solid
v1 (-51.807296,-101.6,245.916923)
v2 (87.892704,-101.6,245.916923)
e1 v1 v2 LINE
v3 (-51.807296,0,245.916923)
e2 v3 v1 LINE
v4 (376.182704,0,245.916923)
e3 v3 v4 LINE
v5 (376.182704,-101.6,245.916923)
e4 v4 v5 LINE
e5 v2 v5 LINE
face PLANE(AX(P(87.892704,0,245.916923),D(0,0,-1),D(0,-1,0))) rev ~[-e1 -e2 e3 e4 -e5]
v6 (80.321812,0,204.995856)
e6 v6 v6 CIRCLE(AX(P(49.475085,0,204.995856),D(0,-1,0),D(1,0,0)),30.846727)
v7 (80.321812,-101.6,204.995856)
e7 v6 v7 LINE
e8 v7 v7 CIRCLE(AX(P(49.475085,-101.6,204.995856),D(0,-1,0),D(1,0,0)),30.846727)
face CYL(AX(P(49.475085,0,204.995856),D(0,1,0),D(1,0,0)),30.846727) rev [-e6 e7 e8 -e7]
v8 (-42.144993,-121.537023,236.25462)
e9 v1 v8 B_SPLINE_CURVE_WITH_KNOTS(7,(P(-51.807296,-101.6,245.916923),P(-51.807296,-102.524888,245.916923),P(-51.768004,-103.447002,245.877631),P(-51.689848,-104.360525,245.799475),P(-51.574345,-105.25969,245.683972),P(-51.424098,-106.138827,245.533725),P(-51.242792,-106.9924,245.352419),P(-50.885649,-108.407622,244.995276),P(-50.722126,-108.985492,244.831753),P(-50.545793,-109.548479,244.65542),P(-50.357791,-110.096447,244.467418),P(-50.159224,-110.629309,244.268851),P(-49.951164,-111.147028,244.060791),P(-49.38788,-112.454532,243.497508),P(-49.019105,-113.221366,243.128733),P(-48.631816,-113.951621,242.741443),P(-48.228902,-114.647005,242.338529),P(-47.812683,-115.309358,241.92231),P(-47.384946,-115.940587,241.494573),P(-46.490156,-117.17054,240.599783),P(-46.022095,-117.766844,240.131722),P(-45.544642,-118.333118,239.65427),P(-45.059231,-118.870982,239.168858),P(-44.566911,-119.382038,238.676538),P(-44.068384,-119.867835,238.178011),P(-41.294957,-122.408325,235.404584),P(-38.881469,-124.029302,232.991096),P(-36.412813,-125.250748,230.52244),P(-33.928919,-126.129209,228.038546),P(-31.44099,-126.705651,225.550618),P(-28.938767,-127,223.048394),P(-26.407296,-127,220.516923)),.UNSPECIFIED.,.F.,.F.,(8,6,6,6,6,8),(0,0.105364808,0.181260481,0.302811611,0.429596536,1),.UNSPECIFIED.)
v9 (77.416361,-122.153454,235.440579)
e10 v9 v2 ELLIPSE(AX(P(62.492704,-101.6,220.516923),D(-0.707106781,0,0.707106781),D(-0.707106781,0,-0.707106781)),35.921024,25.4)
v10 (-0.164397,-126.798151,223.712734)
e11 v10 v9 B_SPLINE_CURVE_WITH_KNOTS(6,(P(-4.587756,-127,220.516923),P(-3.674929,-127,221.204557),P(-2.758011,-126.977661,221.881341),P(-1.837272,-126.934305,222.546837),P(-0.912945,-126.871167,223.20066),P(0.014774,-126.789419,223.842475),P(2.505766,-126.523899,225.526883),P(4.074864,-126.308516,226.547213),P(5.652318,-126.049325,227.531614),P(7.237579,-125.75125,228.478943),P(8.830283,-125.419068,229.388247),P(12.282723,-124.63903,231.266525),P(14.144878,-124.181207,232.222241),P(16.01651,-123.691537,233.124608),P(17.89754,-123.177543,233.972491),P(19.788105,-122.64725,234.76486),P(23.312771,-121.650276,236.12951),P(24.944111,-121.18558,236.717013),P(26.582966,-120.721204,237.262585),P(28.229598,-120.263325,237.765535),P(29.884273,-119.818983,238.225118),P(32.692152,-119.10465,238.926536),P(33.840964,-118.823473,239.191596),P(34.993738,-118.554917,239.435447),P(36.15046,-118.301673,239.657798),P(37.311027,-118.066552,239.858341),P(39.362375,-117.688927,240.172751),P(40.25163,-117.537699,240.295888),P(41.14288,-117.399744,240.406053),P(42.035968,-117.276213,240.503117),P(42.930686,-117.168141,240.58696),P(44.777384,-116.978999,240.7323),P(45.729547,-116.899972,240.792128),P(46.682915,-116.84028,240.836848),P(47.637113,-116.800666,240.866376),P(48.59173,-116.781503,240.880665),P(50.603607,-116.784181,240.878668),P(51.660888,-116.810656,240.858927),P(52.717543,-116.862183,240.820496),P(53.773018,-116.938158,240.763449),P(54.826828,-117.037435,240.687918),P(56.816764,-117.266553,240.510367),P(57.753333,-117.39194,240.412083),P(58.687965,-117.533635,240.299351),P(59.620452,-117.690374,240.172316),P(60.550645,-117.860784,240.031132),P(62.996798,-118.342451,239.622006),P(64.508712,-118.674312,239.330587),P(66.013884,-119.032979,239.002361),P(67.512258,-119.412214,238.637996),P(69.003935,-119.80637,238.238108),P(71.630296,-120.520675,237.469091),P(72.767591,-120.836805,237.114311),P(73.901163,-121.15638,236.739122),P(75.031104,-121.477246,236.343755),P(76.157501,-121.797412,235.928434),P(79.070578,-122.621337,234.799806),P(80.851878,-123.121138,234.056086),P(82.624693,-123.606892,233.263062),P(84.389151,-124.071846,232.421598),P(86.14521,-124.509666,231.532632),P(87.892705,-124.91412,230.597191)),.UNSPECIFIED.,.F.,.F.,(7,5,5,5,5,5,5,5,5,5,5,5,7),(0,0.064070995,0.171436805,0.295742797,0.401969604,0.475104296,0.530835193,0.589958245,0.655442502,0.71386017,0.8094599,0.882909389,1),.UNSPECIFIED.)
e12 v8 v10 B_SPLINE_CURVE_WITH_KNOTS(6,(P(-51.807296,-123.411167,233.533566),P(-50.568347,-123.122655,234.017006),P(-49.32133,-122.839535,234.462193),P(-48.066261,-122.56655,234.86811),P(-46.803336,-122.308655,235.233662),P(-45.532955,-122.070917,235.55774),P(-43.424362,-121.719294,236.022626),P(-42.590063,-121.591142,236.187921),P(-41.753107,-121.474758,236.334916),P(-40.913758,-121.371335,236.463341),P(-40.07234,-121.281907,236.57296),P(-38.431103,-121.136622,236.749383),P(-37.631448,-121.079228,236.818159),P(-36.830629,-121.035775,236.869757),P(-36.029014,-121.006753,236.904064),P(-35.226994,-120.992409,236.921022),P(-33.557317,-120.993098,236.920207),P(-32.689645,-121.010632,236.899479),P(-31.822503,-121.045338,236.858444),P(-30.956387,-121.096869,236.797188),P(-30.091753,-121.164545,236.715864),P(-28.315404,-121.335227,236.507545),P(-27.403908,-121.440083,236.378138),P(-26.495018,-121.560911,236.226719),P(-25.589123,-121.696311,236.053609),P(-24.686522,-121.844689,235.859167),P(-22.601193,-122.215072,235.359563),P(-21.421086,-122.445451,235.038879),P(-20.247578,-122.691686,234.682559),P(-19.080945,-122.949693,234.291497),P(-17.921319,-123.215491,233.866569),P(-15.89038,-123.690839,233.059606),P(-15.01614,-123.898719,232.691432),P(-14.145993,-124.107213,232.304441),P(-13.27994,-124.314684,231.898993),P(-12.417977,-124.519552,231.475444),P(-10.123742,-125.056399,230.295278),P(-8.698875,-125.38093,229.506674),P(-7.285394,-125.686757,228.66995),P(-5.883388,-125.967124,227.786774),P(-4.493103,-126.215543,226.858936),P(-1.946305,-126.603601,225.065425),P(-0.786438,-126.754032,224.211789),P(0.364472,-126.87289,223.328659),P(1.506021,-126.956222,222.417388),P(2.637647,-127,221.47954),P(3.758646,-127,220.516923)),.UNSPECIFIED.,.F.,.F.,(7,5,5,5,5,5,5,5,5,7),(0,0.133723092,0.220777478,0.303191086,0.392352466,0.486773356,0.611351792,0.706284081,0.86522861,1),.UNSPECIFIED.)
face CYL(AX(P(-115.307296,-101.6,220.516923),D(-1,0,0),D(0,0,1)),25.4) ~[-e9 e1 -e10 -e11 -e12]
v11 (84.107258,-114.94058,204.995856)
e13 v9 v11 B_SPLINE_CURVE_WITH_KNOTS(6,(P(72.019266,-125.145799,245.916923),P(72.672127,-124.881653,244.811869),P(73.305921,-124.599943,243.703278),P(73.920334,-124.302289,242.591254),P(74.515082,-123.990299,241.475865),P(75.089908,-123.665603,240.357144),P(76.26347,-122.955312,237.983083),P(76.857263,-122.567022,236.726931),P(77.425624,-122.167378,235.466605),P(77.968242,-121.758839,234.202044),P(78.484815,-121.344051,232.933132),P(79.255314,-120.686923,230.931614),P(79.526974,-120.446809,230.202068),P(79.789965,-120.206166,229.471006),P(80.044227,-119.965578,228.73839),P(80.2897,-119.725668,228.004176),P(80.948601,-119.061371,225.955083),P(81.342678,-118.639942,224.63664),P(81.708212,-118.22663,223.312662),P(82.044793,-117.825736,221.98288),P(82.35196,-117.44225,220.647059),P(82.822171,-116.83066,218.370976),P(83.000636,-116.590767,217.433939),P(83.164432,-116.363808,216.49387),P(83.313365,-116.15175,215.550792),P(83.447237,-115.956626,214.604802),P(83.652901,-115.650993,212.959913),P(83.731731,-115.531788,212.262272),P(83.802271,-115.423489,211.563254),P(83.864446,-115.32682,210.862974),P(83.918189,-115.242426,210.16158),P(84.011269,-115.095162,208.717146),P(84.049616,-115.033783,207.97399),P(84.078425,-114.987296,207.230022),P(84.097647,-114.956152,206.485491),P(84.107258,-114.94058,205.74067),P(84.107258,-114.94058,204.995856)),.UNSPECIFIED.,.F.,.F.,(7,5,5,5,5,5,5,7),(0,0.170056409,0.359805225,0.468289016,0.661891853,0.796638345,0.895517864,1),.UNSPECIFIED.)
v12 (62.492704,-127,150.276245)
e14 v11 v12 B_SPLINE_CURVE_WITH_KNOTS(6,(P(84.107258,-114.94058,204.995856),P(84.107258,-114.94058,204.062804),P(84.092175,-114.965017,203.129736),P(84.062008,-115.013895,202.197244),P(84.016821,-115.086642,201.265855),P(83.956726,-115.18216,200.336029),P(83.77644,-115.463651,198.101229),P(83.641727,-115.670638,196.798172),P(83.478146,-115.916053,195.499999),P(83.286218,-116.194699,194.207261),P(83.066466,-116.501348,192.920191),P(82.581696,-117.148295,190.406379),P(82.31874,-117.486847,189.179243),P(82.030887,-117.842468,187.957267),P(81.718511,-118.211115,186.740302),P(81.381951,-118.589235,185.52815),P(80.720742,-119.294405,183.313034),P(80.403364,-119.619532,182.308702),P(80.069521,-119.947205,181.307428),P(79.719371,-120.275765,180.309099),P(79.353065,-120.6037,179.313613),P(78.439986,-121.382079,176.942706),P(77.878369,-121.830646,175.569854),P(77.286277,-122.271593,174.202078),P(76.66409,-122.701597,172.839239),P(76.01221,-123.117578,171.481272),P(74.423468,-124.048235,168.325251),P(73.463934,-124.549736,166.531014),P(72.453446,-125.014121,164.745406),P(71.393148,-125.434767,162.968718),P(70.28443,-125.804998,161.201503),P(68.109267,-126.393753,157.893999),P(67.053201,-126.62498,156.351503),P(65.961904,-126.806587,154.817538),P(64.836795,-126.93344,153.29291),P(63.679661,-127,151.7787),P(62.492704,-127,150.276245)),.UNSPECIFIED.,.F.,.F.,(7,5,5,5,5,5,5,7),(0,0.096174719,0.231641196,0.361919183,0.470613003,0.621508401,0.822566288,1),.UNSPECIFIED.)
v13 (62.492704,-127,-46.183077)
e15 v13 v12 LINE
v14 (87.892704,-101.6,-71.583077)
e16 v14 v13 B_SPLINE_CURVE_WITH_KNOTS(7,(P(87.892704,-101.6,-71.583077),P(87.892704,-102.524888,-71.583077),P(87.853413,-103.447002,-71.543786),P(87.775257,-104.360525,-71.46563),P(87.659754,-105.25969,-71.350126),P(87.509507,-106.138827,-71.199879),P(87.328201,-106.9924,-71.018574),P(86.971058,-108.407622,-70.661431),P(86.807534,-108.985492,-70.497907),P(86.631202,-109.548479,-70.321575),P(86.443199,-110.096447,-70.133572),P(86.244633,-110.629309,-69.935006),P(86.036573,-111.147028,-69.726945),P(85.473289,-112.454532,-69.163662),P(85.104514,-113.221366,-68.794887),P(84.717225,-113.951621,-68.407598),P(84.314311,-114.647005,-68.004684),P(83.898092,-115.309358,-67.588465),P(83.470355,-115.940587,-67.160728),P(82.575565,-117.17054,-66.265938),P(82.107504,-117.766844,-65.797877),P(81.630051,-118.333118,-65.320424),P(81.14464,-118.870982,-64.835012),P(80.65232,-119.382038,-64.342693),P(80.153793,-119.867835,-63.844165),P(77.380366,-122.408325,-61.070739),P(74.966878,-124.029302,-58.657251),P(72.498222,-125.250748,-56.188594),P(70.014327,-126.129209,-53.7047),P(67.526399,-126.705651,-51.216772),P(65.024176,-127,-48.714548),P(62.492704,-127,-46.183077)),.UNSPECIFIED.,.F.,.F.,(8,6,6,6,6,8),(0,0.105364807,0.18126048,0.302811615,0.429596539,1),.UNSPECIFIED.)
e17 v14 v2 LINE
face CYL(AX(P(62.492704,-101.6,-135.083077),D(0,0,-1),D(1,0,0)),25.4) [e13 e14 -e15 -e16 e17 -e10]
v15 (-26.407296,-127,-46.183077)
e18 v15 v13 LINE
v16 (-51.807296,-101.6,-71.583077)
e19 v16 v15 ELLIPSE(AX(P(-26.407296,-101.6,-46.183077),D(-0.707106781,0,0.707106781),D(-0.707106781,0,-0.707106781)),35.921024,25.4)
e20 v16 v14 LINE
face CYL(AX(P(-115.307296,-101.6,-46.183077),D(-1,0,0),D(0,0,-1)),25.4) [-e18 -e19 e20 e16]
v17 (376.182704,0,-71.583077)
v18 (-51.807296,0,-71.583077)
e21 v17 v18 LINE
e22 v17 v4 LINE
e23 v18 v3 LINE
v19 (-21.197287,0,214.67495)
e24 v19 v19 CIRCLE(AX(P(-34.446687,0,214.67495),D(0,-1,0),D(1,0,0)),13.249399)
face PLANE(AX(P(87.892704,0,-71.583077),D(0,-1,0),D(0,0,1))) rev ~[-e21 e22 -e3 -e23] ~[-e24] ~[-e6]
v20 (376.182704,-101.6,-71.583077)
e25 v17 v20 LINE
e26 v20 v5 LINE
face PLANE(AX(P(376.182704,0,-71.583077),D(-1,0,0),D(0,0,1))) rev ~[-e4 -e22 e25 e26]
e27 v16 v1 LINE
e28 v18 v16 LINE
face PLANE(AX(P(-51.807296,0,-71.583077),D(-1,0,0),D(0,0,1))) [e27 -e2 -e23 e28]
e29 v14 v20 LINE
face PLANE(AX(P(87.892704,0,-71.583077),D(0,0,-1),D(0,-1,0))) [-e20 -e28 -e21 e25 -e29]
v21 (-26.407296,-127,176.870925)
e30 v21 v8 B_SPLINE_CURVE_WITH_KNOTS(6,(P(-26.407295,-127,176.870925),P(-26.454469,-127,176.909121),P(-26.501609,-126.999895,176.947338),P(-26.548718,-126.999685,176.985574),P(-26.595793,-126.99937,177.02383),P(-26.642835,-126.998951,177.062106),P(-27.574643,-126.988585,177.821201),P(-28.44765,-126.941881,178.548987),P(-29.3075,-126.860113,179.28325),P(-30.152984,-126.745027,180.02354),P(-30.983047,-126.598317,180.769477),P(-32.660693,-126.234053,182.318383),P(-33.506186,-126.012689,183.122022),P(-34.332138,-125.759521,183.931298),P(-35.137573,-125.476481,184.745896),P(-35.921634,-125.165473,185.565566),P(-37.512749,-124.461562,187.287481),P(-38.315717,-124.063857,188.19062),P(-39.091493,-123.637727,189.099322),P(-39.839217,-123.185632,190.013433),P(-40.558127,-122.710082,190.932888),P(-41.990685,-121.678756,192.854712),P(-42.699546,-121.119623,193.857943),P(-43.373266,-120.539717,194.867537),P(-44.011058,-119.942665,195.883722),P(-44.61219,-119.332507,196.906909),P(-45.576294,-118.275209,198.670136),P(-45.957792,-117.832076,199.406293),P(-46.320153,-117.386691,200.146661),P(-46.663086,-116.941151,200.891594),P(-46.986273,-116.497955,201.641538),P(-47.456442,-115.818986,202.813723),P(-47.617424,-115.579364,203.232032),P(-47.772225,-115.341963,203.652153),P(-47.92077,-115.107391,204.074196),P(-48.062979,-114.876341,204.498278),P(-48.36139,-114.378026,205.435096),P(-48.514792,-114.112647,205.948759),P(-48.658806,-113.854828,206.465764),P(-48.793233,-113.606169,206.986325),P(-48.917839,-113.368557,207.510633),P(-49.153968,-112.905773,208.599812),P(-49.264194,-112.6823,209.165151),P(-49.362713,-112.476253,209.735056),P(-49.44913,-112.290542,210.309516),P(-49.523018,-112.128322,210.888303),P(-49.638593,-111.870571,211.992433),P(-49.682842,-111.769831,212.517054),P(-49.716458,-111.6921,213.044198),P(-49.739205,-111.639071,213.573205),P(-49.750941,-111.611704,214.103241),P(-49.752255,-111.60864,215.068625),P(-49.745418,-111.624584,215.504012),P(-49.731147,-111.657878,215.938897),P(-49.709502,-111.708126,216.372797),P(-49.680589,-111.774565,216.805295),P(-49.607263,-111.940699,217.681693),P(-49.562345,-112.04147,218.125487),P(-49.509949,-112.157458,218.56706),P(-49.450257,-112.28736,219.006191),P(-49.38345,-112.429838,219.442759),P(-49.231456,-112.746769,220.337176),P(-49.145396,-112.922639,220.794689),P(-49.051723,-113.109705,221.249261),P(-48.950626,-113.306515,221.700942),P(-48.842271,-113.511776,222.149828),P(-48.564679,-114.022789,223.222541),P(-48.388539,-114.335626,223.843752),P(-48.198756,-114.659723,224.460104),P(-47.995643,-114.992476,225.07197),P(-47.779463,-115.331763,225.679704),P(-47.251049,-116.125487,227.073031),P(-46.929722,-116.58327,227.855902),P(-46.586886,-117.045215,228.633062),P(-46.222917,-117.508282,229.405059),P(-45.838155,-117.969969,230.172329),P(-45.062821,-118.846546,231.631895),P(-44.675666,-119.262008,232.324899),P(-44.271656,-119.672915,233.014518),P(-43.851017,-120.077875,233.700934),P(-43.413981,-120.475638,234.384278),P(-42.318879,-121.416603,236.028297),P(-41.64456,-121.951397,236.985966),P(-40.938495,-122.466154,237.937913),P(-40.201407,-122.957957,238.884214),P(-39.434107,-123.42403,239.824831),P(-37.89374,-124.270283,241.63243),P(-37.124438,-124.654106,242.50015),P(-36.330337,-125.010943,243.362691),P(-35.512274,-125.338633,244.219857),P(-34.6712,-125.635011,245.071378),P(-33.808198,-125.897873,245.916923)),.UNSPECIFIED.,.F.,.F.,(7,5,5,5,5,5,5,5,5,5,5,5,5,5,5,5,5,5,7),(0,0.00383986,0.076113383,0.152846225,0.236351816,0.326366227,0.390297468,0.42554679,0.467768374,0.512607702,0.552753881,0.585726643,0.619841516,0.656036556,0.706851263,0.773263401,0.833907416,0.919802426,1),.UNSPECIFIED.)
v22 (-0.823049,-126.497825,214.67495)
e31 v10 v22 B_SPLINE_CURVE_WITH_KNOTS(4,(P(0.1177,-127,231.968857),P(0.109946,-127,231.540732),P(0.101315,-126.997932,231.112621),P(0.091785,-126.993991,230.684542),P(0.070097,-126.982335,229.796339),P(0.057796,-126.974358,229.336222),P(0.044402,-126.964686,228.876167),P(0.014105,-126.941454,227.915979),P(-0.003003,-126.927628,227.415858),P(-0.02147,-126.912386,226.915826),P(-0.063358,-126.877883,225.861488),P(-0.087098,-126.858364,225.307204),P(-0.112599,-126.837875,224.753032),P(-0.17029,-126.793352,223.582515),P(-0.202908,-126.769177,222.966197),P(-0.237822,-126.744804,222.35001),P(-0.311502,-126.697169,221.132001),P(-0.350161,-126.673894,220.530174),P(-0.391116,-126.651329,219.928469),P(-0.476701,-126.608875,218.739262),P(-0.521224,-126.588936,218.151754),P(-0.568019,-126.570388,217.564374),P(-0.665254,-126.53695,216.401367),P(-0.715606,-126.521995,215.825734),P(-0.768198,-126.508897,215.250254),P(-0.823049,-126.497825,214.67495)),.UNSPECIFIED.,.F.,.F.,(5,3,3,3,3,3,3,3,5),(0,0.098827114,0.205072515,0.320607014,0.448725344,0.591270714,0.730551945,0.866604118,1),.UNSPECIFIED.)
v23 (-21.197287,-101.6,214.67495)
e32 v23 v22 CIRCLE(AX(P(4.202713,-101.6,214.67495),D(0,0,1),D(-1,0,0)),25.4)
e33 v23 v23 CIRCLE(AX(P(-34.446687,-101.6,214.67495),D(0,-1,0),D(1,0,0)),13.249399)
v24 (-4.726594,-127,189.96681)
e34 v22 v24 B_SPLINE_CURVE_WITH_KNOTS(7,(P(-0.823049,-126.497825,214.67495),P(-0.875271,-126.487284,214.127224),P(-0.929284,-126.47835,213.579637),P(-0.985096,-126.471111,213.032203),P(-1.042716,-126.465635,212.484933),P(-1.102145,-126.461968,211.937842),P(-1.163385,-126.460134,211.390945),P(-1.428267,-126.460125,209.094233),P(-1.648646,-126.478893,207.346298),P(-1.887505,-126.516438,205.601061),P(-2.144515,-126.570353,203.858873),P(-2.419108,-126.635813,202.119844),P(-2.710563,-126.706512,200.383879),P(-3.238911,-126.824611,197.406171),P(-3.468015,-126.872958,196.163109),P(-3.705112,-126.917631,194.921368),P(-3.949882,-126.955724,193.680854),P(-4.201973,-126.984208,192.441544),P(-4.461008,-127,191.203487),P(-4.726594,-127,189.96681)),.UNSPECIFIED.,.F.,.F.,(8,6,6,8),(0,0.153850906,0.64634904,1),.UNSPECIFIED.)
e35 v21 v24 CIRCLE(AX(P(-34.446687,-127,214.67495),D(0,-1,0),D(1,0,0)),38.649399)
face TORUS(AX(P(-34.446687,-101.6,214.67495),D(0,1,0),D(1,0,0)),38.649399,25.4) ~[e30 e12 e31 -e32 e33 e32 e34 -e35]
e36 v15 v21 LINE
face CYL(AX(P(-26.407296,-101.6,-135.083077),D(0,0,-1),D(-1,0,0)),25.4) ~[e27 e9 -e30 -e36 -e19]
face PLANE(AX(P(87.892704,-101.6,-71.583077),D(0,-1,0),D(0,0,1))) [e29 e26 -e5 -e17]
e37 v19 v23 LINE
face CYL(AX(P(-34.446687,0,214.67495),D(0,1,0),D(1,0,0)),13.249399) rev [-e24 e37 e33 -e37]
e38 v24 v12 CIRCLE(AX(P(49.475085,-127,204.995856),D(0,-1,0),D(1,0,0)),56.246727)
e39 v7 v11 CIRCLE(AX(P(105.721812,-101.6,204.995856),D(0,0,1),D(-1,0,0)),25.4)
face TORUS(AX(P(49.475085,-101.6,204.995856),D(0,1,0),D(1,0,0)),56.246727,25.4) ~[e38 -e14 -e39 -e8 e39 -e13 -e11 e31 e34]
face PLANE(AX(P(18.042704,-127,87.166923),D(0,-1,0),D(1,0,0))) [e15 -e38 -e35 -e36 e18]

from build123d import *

# Parameters (mm, degrees)
F0_W        = 139.7
F0_H        = 317.5
F0_R        = 13.2493993782
F0_R_2      = 30.8467265461
F1_DEPTH    = 127
F2_T1_DEPTH = 266.7
F2_T3_DEPTH = 444.5
F3_DEPTH    = 288.29


# Not quite as in the source:
# - a fillet or chamfer that OpenCascade refuses, or shapes differently, is made with other operations: its cross-section is extruded or revolved along the edge and cut away or added


with BuildPart() as f1:
    # F0 (on Front) → F1 (new body)
    with BuildSketch(Plane.XZ):
        with Locations((18.042704469, 87.1669226885)):
            Rectangle(F0_W, F0_H)
        with Locations((-34.4466865063, 214.674949646)):
            Circle(F0_R, mode=Mode.SUBTRACT)
        with Locations((49.4750849903, 204.995855689)):
            Circle(F0_R_2, mode=Mode.SUBTRACT)
    extrude(amount=F1_DEPTH)

    # F2: fillet of radius 25.4 on 6 edges, made by hand

    # F2_s2 → F2_t1 (cut)
    with BuildSketch(Plane.YZ.offset(-115.307295531)):
        with BuildLine():
            ThreePointArc((-101.6, 245.9169226885), (-119.5605122421, 238.4774349306), (-127, 220.5169226885))
            Line((-127, 220.5169226885), (-127, 245.9169226885))
            Line((-127, 245.9169226885), (-101.6, 245.9169226885))
        make_face()
        with BuildLine():
            ThreePointArc((-101.6, -71.5830773115), (-119.5605122421, -64.1435895537), (-127, -46.1830773115))
            Line((-127, -46.1830773115), (-127, -71.5830773115))
            Line((-127, -71.5830773115), (-101.6, -71.5830773115))
        make_face()
    extrude(amount=F2_T1_DEPTH, mode=Mode.SUBTRACT)

    # F2_s4 → F2_t3 (cut)
    with BuildSketch(Plane.XY.offset(-135.0830773115)):
        with BuildLine():
            ThreePointArc((-51.807295531, -101.6), (-44.3678077732, -119.5605122421), (-26.407295531, -127))
            Line((-26.407295531, -127), (-51.807295531, -127))
            Line((-51.807295531, -127), (-51.807295531, -101.6))
        make_face()
        with BuildLine():
            ThreePointArc((87.892704469, -101.6), (80.4532167111, -119.5605122421), (62.492704469, -127))
            Line((62.492704469, -127), (87.892704469, -127))
            Line((87.892704469, -127), (87.892704469, -101.6))
        make_face()
    extrude(amount=F2_T3_DEPTH, mode=Mode.SUBTRACT)

    # F2_s5 → F2_t6 (revolve, cut)
    with BuildSketch(Plane.XY.offset(214.674949646)):
        with BuildLine():
            ThreePointArc((-21.197287128, -101.6), (-13.7577993702, -119.5605122421), (4.202712872, -127))
            Line((4.202712872, -127), (-21.197287128, -127))
            Line((-21.197287128, -127), (-21.197287128, -101.6))
        make_face()
    revolve(axis=Axis((-34.4466865063, -127, 214.674949646), (0, -1, 0)), mode=Mode.SUBTRACT)

    # F2_s7 → F2_t8 (revolve, cut)
    with BuildSketch(Plane.XY.offset(204.995855689)):
        with BuildLine():
            ThreePointArc((80.3218115364, -101.6), (87.7612992942, -119.5605122421), (105.7218115364, -127))
            Line((105.7218115364, -127), (80.3218115364, -127))
            Line((80.3218115364, -127), (80.3218115364, -101.6))
        make_face()
    revolve(axis=Axis((49.4750849903, -127, 204.995855689), (0, -1, 0)), mode=Mode.SUBTRACT)

    # F3 (add): a face of the model
    f3_faces = [f1.faces().sort_by_distance(p)[0] for p in [
        (87.892704469, -50.8, 87.1669226885),
    ]]
    extrude(f3_faces, amount=F3_DEPTH)


solid = f1.part
